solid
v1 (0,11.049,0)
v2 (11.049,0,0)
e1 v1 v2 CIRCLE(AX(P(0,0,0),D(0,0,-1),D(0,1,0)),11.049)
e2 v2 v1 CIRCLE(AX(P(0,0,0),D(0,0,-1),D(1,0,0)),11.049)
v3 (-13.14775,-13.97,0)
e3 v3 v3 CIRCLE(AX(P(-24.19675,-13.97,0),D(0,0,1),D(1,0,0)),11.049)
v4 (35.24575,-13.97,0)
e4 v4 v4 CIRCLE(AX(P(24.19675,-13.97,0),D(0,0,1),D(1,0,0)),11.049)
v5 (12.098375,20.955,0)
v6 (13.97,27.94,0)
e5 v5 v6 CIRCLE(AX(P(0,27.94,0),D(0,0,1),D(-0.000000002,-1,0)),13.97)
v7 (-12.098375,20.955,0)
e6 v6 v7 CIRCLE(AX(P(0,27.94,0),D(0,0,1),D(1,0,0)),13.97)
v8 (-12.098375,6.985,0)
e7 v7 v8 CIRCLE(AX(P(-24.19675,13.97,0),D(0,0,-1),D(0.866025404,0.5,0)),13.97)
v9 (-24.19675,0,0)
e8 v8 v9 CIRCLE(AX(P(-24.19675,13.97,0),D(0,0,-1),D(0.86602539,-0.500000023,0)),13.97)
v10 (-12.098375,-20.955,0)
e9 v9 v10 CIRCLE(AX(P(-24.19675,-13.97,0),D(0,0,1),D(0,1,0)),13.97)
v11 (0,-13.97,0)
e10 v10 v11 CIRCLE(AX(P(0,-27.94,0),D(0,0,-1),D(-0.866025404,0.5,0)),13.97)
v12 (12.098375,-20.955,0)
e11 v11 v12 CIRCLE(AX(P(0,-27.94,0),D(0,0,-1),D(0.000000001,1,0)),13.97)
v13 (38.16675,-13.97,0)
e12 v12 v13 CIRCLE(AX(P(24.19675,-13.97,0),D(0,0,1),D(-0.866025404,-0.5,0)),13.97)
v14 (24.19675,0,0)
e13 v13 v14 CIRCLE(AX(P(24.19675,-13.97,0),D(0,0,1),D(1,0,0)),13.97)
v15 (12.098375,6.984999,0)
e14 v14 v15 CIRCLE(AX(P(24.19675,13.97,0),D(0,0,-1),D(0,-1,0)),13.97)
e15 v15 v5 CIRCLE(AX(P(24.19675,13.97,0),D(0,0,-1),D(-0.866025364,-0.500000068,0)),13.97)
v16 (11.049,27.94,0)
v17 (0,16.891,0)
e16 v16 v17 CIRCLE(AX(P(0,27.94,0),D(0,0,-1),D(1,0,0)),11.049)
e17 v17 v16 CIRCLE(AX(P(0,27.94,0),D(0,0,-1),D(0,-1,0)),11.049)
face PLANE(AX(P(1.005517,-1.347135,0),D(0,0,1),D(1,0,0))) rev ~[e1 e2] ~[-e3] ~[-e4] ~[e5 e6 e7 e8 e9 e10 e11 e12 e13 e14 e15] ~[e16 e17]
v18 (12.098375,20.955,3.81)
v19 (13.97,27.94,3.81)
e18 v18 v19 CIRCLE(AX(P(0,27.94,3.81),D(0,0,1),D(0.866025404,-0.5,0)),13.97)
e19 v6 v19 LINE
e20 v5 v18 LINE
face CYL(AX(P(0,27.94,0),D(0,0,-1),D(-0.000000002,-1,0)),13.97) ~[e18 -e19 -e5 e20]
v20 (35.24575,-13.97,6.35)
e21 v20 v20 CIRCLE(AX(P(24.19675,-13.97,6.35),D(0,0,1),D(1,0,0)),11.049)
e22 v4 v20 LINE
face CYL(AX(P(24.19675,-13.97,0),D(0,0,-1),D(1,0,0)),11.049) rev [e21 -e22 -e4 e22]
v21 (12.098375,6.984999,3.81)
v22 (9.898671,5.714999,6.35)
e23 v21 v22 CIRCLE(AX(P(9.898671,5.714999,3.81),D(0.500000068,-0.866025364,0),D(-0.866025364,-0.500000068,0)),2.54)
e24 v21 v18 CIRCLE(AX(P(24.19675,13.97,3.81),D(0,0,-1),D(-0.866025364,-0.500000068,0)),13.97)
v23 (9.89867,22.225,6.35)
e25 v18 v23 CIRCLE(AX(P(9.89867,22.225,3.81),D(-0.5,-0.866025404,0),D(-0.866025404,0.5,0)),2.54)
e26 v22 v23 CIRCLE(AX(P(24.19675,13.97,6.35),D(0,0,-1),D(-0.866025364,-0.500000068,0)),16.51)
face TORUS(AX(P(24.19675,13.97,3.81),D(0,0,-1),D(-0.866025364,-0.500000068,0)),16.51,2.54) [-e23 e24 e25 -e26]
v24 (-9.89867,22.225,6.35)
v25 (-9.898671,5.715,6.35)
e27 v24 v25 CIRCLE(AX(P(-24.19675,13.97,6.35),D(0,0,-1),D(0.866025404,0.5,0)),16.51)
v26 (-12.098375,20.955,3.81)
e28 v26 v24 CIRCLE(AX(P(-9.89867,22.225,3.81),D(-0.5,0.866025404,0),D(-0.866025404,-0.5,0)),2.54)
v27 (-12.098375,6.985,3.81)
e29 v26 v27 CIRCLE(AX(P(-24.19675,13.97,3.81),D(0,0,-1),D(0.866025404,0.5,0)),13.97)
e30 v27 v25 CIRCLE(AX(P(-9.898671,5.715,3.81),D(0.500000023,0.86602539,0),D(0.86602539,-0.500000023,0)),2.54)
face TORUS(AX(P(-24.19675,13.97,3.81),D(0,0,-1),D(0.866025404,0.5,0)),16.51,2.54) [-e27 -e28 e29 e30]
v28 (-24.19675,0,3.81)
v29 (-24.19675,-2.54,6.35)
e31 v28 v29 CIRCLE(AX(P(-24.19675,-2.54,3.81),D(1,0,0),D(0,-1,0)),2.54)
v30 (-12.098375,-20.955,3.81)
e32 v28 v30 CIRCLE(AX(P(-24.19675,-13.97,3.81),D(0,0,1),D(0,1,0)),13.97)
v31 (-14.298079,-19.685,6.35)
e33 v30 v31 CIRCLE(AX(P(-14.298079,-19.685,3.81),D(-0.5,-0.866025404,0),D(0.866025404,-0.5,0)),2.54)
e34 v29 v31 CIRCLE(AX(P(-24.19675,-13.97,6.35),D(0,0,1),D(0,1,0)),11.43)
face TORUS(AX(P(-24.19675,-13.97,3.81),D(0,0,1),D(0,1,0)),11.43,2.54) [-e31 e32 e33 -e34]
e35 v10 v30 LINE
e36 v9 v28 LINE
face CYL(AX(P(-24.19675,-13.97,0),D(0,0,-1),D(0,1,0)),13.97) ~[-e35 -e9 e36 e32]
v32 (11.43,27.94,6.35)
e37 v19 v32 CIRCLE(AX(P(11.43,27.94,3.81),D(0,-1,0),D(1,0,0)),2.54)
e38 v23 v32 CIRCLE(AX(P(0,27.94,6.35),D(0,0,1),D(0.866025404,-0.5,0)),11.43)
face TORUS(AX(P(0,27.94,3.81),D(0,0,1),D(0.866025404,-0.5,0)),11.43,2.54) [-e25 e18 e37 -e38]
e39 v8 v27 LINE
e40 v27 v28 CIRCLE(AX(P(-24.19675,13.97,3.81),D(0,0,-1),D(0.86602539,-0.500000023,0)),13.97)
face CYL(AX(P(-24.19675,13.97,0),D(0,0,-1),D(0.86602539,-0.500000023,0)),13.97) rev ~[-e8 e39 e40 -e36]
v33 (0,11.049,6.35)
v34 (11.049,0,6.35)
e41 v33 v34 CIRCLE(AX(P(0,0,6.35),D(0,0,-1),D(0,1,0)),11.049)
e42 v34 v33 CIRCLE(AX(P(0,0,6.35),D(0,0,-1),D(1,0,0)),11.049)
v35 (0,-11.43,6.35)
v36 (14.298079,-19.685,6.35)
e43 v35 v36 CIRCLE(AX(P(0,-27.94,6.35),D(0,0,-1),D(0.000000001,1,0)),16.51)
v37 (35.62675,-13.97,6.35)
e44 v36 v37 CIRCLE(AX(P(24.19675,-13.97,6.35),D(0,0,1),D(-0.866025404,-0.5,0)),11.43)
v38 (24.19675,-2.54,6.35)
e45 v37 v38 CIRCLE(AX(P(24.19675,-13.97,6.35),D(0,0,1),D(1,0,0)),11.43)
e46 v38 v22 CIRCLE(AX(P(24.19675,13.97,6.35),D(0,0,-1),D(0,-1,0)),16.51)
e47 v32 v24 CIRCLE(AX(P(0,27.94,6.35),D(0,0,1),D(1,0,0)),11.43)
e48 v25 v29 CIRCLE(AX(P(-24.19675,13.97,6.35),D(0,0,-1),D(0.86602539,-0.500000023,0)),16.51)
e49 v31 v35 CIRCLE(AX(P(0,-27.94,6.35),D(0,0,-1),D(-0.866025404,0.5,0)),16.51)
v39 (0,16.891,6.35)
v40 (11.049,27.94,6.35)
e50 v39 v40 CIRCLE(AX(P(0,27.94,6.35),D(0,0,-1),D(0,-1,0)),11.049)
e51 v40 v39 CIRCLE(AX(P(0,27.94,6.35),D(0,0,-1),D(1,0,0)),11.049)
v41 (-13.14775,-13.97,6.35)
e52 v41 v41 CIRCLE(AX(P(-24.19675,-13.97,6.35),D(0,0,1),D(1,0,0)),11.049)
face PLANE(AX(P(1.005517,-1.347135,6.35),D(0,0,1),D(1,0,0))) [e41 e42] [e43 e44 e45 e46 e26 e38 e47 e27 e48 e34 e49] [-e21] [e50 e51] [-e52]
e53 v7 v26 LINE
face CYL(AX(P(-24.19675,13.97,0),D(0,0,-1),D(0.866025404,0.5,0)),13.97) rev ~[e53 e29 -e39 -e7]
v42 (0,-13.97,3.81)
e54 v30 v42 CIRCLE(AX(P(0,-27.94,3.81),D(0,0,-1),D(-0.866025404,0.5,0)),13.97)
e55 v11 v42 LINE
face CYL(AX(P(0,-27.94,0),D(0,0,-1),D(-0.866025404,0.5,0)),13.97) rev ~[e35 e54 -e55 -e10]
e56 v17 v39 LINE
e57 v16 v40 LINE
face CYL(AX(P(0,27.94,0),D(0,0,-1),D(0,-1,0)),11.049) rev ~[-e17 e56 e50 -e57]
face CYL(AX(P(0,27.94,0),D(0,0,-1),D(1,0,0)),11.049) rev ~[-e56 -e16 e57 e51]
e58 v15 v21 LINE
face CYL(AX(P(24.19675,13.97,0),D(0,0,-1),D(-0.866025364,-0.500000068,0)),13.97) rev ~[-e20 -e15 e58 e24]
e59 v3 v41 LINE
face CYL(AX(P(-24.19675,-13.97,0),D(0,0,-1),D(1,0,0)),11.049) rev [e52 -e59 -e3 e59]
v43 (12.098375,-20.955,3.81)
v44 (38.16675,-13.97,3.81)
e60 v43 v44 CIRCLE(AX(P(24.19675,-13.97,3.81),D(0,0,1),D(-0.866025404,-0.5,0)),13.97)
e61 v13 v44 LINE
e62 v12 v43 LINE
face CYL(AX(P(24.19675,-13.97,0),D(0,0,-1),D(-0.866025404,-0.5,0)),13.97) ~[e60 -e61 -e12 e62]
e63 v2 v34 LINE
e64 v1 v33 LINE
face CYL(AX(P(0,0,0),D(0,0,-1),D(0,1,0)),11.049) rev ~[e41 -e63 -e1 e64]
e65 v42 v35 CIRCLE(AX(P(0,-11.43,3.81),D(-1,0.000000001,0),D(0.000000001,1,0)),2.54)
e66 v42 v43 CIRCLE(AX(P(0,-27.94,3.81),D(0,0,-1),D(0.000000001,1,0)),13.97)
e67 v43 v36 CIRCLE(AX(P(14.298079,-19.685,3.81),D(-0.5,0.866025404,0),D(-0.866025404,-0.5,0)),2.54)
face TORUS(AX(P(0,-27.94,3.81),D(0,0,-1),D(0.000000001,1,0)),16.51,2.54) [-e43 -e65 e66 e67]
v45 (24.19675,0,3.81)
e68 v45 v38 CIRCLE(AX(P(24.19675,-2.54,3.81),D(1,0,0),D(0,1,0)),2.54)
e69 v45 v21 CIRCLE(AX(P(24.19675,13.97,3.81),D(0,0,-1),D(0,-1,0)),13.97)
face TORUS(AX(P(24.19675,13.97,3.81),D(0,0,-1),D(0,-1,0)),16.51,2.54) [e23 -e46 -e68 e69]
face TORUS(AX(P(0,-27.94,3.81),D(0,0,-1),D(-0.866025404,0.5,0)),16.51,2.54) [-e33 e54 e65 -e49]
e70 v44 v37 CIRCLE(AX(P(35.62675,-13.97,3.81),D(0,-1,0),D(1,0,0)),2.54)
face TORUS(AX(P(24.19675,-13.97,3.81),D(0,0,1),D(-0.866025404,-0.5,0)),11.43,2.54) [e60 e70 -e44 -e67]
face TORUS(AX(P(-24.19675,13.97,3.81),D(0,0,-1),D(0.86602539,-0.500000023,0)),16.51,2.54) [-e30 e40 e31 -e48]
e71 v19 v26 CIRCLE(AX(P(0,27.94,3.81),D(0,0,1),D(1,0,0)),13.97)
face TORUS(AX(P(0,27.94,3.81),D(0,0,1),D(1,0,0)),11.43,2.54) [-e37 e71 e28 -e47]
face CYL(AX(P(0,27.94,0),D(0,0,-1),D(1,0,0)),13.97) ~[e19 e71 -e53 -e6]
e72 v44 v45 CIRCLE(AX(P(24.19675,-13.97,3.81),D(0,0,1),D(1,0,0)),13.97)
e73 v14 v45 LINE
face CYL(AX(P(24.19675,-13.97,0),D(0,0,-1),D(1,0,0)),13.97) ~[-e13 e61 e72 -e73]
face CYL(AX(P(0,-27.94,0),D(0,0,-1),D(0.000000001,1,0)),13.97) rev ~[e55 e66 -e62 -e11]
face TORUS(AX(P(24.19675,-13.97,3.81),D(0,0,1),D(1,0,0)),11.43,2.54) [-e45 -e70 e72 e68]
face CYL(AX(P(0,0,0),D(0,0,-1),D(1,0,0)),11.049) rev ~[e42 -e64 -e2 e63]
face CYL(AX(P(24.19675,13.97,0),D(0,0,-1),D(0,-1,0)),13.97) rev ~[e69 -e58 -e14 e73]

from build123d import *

# Parameters (mm, degrees)
F0_R     = 11.049
F1_DEPTH = 6.35
F2_R     = 2.54


# Not quite as in the source:
# - ends of sketch curves that miss each other by under 0.0002 mm in the source are joined


with BuildPart() as f1:
    # F0 (on Top) → F1 (new body)
    with BuildSketch(Plane.XY):
        with BuildLine():
            ThreePointArc((0, 11.049), (7.8128228253, 7.8128228253), (11.049, 0))
            ThreePointArc((11.049, 0), (-2.8596916293, -10.6725144547), (-9.5687146864, 5.5245))
            Line((-9.5687146864, 5.5245), (-12.0983748909, 6.985))
            ThreePointArc((-12.0983748909, 6.985), (-13.97, 3.443e-07), (-12.0983754224, -6.9849990793))
            ThreePointArc((-12.0983754224, -6.9849990793), (-6.9850004566, -12.0983746273), (8.7e-09, -13.97))
            ThreePointArc((8.7e-09, -13.97), (6.9850004798, -12.0983746139), (12.0983754405, -6.984999048))
            ThreePointArc((12.0983754405, -6.984999048), (13.4939839355, -3.6157015292), (13.97, 0))
            ThreePointArc((13.97, 0), (13.4939839355, 3.6157015292), (12.0983754405, 6.984999048))
            ThreePointArc((12.0983754405, 6.984999048), (6.9850004648, 12.0983746225), (-2.58e-08, 13.97))
            Line((-2.58e-08, 13.97), (0, 11.049))
        make_face()
        with BuildLine():
            ThreePointArc((-9.5687146864, 5.5245), (-5.5245, 9.5687146864), (0, 11.049))
            Line((0, 11.049), (0, 13.97))
            ThreePointArc((0, 13.97), (-6.9850001734, 12.0983747908), (-12.0983750781, 6.9849996757))
            Line((-12.0983750781, 6.9849996757), (-9.5687146864, 5.5245))
        make_face()
        with BuildLine():
            ThreePointArc((-12.0983750781, 6.9849996757), (-6.9850001734, 12.0983747908), (-2.58e-08, 13.97))
            ThreePointArc((-2.58e-08, 13.97), (-6.9850000112, 15.8416251156), (-12.0983748909, 20.955))
            ThreePointArc((-12.0983748909, 20.955), (-10.2267497817, 13.9699998127), (-12.0983750781, 6.9849996757))
        make_face()
        with BuildLine():
            ThreePointArc((-12.0983748909, 20.955), (-6.9850000112, 15.8416251156), (-2.58e-08, 13.97))
            ThreePointArc((-2.58e-08, 13.97), (6.9849999888, 15.8416251027), (12.0983748909, 20.955))
            ThreePointArc((12.0983748909, 20.955), (13.4939837933, 24.3242979399), (13.97, 27.94))
            ThreePointArc((13.97, 27.94), (-3.6157020601, 41.4339837933), (-12.0983748909, 20.955))
        make_face()
        with BuildLine():
            ThreePointArc((11.049, 27.94), (7.8128228253, 20.1271771747), (0, 16.891))
            ThreePointArc((0, 16.891), (-7.8128228253, 35.7528228253), (11.049, 27.94))
        make_face(mode=Mode.SUBTRACT)
        with BuildLine():
            ThreePointArc((12.0983748909, 20.955), (6.9849999888, 15.8416251027), (-2.58e-08, 13.97))
            ThreePointArc((-2.58e-08, 13.97), (6.9850004648, 12.0983746225), (12.0983754405, 6.984999048))
            ThreePointArc((12.0983754405, 6.984999048), (10.2267497817, 13.9699994504), (12.0983748909, 20.955))
        make_face()
        with BuildLine():
            ThreePointArc((-12.0983754224, -6.9849990793), (-13.97, 3.443e-07), (-12.0983750781, 6.9849996757))
            ThreePointArc((-12.0983750781, 6.9849996757), (-17.2117499439, 1.8716250155), (-24.1967497817, 0))
            ThreePointArc((-24.1967497817, 0), (-17.2117502421, -1.8716248433), (-12.0983754224, -6.9849990793))
        make_face()
        with BuildLine():
            ThreePointArc((24.1967497817, 0), (17.2117502577, 1.8716248343), (12.0983754405, 6.984999048))
            ThreePointArc((12.0983754405, 6.984999048), (13.4939839355, 3.6157015292), (13.97, 0))
            ThreePointArc((13.97, 0), (13.4939839355, -3.6157015292), (12.0983754405, -6.984999048))
            ThreePointArc((12.0983754405, -6.984999048), (17.2117502577, -1.8716248343), (24.1967497817, 0))
        make_face()
        with BuildLine():
            ThreePointArc((8.7e-09, -13.97), (-6.9850004566, -12.0983746273), (-12.0983754224, -6.9849990793))
            ThreePointArc((-12.0983754224, -6.9849990793), (-10.7027661261, -10.3542974265), (-10.2267497817, -13.97))
            ThreePointArc((-10.2267497817, -13.97), (-10.7027659885, -17.5857020601), (-12.0983748909, -20.955))
            ThreePointArc((-12.0983748909, -20.955), (-6.9849999962, -15.841625107), (8.7e-09, -13.97))
        make_face()
        with BuildLine():
            ThreePointArc((-10.2267497817, -13.97), (-10.7027661261, -10.3542974265), (-12.0983754224, -6.9849990793))
            ThreePointArc((-12.0983754224, -6.9849990793), (-17.2117502421, -1.8716248433), (-24.1967497817, 0))
            ThreePointArc((-24.1967497817, 0), (-36.2951246726, -20.955), (-12.0983748909, -20.955))
            ThreePointArc((-12.0983748909, -20.955), (-10.7027659885, -17.5857020601), (-10.2267497817, -13.97))
        make_face()
        with Locations((-24.1967497817, -13.97)):
            Circle(F0_R, mode=Mode.SUBTRACT)
        with BuildLine():
            ThreePointArc((38.1667497817, -13.97), (34.0750315149, -4.0917182668), (24.1967497817, 0))
            ThreePointArc((24.1967497817, 0), (17.2117502577, -1.8716248343), (12.0983754405, -6.984999048))
            ThreePointArc((12.0983754405, -6.984999048), (10.2267497817, -13.9699994504), (12.0983748909, -20.955))
            ThreePointArc((12.0983748909, -20.955), (27.8124518418, -27.4639837933), (38.1667497817, -13.97))
        make_face()
        with Locations((24.1967497817, -13.97)):
            Circle(F0_R, mode=Mode.SUBTRACT)
        with BuildLine():
            ThreePointArc((12.0983754405, -6.984999048), (6.9850004798, -12.0983746139), (8.7e-09, -13.97))
            ThreePointArc((8.7e-09, -13.97), (6.9850000038, -15.8416251113), (12.0983748909, -20.955))
            ThreePointArc((12.0983748909, -20.955), (10.2267497817, -13.9699994504), (12.0983754405, -6.984999048))
        make_face()
    extrude(amount=F1_DEPTH)

    # F2
    f2_edges = [f1.edges().sort_by_distance(p)[0] for p in [
        (0, -13.97, 6.35),
        (36.295125, -20.955, 6.35),
        (12.098375, 6.985, 6.35),
        (0, 41.91, 6.35),
        (-12.098375, 6.985, 6.35),
        (-36.295125, -20.955, 6.35),
    ]]
    fillet(f2_edges, radius=F2_R)


solid = f1.part
